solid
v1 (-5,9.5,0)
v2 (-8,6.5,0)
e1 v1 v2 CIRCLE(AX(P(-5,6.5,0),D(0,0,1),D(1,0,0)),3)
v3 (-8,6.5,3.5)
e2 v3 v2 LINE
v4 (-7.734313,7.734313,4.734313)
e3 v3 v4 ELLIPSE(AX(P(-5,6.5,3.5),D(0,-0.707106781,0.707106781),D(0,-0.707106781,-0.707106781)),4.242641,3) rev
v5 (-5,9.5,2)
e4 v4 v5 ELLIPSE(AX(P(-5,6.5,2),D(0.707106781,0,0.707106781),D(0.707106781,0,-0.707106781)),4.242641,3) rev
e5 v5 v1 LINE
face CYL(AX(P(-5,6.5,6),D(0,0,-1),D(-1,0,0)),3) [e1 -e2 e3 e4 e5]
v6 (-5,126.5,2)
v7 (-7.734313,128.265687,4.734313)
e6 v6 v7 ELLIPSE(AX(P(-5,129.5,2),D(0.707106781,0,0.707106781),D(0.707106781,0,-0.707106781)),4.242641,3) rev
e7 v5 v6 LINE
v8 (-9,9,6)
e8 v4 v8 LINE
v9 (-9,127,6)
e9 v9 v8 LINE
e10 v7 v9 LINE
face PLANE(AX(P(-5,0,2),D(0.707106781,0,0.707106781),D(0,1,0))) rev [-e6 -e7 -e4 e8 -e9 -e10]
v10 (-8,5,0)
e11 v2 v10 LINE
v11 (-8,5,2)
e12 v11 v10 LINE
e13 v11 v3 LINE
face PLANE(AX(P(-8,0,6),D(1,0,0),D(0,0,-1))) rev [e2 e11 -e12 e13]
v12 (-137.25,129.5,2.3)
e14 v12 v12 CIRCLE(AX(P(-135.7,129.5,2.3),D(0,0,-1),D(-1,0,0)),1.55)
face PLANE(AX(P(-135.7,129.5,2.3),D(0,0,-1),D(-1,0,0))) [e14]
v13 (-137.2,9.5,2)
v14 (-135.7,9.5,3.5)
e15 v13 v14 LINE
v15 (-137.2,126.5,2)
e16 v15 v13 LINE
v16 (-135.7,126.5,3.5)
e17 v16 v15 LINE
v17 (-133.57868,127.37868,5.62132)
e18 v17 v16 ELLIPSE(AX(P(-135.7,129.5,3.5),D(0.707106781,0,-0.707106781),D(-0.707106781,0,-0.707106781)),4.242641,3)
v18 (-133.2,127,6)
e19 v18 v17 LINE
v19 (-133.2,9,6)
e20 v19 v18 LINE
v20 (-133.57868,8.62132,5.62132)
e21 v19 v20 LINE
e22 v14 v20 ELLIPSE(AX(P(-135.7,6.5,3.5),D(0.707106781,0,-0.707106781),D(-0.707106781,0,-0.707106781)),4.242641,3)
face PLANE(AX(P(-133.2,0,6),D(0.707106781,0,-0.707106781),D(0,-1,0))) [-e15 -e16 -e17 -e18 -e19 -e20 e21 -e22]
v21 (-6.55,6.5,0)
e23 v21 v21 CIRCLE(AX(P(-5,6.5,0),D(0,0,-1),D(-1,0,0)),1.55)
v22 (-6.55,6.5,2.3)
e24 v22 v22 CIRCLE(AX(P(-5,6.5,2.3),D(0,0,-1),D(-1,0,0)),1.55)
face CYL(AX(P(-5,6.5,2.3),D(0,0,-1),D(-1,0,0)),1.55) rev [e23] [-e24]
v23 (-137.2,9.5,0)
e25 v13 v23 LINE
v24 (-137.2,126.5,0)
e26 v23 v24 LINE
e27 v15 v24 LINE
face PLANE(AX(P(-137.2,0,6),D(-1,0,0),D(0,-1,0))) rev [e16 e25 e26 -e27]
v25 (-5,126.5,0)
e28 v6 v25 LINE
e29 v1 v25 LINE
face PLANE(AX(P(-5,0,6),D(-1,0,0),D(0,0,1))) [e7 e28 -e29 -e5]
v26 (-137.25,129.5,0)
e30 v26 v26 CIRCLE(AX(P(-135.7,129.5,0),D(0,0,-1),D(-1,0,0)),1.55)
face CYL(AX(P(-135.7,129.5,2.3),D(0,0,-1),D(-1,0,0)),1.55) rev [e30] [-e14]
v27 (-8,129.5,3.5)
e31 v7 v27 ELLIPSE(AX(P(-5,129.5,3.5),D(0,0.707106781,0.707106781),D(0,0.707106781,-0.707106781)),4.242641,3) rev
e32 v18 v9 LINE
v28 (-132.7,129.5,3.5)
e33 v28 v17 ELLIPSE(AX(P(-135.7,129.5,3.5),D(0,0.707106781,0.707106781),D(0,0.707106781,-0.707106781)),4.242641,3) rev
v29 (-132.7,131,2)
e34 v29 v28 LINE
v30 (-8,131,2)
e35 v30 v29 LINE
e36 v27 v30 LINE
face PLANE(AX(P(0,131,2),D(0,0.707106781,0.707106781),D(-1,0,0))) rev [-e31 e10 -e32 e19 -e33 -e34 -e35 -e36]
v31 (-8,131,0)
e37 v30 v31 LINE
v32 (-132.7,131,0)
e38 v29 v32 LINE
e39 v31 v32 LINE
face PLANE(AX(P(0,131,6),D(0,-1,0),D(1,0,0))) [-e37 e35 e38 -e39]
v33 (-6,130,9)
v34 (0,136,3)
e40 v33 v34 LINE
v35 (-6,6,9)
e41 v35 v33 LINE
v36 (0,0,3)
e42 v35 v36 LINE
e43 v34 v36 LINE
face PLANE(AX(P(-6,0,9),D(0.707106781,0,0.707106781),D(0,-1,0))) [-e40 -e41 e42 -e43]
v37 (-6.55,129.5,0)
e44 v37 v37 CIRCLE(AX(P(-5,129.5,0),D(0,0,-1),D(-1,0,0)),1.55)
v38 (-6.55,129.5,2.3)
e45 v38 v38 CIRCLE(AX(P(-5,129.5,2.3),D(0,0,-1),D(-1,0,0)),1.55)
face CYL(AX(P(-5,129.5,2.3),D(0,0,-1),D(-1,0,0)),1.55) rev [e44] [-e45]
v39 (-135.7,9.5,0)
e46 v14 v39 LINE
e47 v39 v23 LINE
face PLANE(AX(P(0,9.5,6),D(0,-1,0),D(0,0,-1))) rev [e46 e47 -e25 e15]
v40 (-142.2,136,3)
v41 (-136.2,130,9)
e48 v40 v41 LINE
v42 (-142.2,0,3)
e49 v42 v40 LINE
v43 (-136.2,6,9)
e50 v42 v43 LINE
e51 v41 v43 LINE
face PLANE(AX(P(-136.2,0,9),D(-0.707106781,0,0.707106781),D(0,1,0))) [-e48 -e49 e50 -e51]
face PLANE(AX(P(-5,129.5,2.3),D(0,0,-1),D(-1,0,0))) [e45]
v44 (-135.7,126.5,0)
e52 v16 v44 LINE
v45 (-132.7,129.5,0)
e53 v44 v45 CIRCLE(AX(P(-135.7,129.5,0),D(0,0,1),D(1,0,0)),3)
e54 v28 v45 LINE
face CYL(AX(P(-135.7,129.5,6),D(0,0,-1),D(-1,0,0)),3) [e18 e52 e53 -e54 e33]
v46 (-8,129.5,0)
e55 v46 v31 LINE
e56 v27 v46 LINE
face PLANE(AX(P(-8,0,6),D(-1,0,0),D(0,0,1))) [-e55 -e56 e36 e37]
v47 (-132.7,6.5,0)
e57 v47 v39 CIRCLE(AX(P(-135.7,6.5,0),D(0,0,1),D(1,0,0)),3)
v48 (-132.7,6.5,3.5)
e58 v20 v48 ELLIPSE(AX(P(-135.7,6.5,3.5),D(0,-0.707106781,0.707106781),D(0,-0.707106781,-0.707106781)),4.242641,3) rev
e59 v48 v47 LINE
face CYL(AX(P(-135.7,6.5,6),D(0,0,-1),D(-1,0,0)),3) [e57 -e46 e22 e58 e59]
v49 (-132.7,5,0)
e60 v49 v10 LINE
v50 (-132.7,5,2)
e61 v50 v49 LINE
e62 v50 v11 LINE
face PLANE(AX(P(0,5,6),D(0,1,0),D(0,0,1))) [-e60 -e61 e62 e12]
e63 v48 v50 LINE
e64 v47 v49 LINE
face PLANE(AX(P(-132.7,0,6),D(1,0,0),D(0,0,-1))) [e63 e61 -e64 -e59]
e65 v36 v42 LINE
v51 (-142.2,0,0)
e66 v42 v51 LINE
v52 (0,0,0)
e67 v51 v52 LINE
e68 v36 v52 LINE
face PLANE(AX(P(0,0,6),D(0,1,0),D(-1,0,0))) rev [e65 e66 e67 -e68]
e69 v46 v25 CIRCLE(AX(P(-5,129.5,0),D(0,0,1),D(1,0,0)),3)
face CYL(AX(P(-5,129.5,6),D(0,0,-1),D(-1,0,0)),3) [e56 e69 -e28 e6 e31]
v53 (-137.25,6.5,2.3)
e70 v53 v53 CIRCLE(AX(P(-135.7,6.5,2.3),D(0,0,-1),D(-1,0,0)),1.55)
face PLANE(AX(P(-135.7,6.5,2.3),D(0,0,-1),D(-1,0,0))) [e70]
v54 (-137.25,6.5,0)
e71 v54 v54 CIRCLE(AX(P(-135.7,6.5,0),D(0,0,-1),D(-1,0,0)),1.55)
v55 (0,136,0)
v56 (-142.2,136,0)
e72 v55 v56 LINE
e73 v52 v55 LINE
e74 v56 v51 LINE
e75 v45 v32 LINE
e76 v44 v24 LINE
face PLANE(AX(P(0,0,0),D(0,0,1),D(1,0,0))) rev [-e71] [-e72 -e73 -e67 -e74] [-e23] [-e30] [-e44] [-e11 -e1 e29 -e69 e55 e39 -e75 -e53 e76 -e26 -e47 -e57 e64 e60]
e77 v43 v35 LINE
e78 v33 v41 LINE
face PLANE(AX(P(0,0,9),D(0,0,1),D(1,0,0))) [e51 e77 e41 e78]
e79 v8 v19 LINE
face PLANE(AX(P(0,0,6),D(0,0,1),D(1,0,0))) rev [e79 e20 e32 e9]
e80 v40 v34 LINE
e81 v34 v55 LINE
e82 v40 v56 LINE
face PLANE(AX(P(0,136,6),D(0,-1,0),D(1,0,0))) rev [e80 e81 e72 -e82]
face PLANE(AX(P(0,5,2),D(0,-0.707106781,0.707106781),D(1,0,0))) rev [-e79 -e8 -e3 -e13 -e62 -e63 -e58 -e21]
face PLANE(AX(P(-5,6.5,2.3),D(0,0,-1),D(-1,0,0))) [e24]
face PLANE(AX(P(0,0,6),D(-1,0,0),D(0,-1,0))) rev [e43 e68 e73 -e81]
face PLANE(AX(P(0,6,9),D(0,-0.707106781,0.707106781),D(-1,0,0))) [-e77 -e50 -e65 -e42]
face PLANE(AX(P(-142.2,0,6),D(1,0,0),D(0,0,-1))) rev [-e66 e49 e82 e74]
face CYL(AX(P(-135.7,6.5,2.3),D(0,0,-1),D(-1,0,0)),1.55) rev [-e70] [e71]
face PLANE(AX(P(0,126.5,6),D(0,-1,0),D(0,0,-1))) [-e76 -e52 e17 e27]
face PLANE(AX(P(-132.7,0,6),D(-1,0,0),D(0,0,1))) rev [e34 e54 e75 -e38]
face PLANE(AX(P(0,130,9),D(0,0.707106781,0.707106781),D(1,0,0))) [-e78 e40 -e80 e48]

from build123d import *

# Parameters (mm, degrees)
SKETCH1_W           = 142.2
SKETCH1_H           = 136
BOSS_EXTRUDE1_DEPTH = 6
SKETCH2_W           = 142.2
SKETCH2_H           = 136
BOSS_EXTRUDE2_DEPTH = 3
CHAMFER1_SIZE       = 6
CHAMFER2_SIZE       = 4
SKETCH3_R           = 1.55
CUT_EXTRUDE1_DEPTH  = 2.3


with BuildPart() as part:
    # Sketch1 → Boss-Extrude1 (new body)
    with BuildSketch(Plane.XY):
        with Locations((-71.1, 68)):
            Rectangle(SKETCH1_W, SKETCH1_H)
        with BuildLine():
            ThreePointArc((-5, 9.5), (-7.121320344, 8.621320344), (-8, 6.5))
            Line((-8, 6.5), (-8, 5))
            Line((-8, 5), (-132.7, 5))
            Line((-132.7, 5), (-132.7, 6.5))
            ThreePointArc((-132.7, 6.5), (-133.578679656, 8.621320344), (-135.7, 9.5))
            Line((-135.7, 9.5), (-137.2, 9.5))
            Line((-137.2, 9.5), (-137.2, 126.5))
            Line((-137.2, 126.5), (-135.7, 126.5))
            ThreePointArc((-135.7, 126.5), (-133.578679656, 127.378679656), (-132.7, 129.5))
            Line((-132.7, 129.5), (-132.7, 131))
            Line((-132.7, 131), (-8, 131))
            Line((-8, 131), (-8, 129.5))
            ThreePointArc((-8, 129.5), (-7.121320344, 127.378679656), (-5, 126.5))
            Line((-5, 126.5), (-5, 9.5))
        make_face(mode=Mode.SUBTRACT)
    extrude(amount=BOSS_EXTRUDE1_DEPTH)

    # Sketch2 → Boss-Extrude2 (add)
    with BuildSketch(Plane.XY.offset(6)):
        with Locations((-71.1, 68)):
            Rectangle(SKETCH2_W, SKETCH2_H)
    extrude(amount=BOSS_EXTRUDE2_DEPTH)

    # Chamfer1
    chamfer1_edges = [part.edges().sort_by_distance(p)[0] for p in [
        (-142.2, 68, 9),
        (-71.1, 0, 9),
        (0, 68, 9),
        (-71.1, 136, 9),
    ]]
    chamfer(chamfer1_edges, length=CHAMFER1_SIZE)

    # Chamfer2
    # the kernel refuses this chamfer: 4 mm, written as the material it adds along each edge
    with BuildSketch(Plane(origin=(-142.986731952, 131, 6), x_dir=(0, 0.02749587661058907, -0.9996219169112965), z_dir=(1, 0, 0))) as chamfer2_piece_1_section:
        Polygon((CHAMFER2_SIZE * 0.999621916911, -CHAMFER2_SIZE * 0.0274958766106), (-CHAMFER2_SIZE * 0.0274958766106, -CHAMFER2_SIZE * 0.999621916911), (0, 0), align=None)
    chamfer2_piece_1 = extrude(amount=145.273463904, mode=Mode.PRIVATE)
    chamfer2_piece_1 = split(chamfer2_piece_1, bisect_by=Plane(origin=(-142.2, 127.973585933, 5.513207057), z_dir=(1, 0, 0)), keep=Keep.TOP, mode=Mode.PRIVATE)
    chamfer2_piece_1 = split(chamfer2_piece_1, bisect_by=Plane(origin=(0, 127.973585933, 5.513207057), z_dir=(-1, 0, 0)), keep=Keep.TOP, mode=Mode.PRIVATE)
    chamfer2_piece_1 = split(chamfer2_piece_1, bisect_by=Plane(origin=(-136.314439618, 127.973585933, 8.885560382), z_dir=(0.7071067811865476, 0, -0.7071067811865476)), keep=Keep.TOP, mode=Mode.PRIVATE)
    chamfer2_piece_1 = split(chamfer2_piece_1, bisect_by=Plane(origin=(-67.727646674, 127.973585933, 70.727646674), z_dir=(-0.7071067811865476, 0, -0.7071067811865476)), keep=Keep.TOP, mode=Mode.PRIVATE)
    add(chamfer2_piece_1)
    with BuildSketch(Plane(origin=(-5, 136.786731952, 6), x_dir=(0.02749587661058627, 0, -0.9996219169112968), z_dir=(0, -1, 0))) as chamfer2_piece_2_section:
        Polygon((CHAMFER2_SIZE * 0.999621916911, -CHAMFER2_SIZE * 0.0274958766106), (-CHAMFER2_SIZE * 0.0274958766106, -CHAMFER2_SIZE * 0.999621916911), (0, 0), align=None)
    chamfer2_piece_2 = extrude(amount=137.573463904, mode=Mode.PRIVATE)
    chamfer2_piece_2 = split(chamfer2_piece_2, bisect_by=Plane(origin=(-8.333333333, 5, 5.666666667), z_dir=(0, 1, 0)), keep=Keep.TOP, mode=Mode.PRIVATE)
    chamfer2_piece_2 = split(chamfer2_piece_2, bisect_by=Plane(origin=(-8.333333333, 131, 5.666666667), z_dir=(0, -1, 0)), keep=Keep.TOP, mode=Mode.PRIVATE)
    add(chamfer2_piece_2)
    with BuildSketch(Plane(origin=(2.286731952, 5, 6), x_dir=(0, -0.02749587661058627, -0.9996219169112968), z_dir=(-1, 0, 0))) as chamfer2_piece_3_section:
        Polygon((CHAMFER2_SIZE * 0.999621916911, -CHAMFER2_SIZE * 0.0274958766106), (-CHAMFER2_SIZE * 0.0274958766106, -CHAMFER2_SIZE * 0.999621916911), (0, 0), align=None)
    chamfer2_piece_3 = extrude(amount=145.273463904, mode=Mode.PRIVATE)
    chamfer2_piece_3 = split(chamfer2_piece_3, bisect_by=Plane(origin=(-142.2, 8.026414067, 5.513207057), z_dir=(1, 0, 0)), keep=Keep.TOP, mode=Mode.PRIVATE)
    chamfer2_piece_3 = split(chamfer2_piece_3, bisect_by=Plane(origin=(0, 8.026414067, 5.513207057), z_dir=(-1, 0, 0)), keep=Keep.TOP, mode=Mode.PRIVATE)
    chamfer2_piece_3 = split(chamfer2_piece_3, bisect_by=Plane(origin=(-73.722353326, 8.026414067, 71.477646674), z_dir=(0.7071067811865476, 0, -0.7071067811865476)), keep=Keep.TOP, mode=Mode.PRIVATE)
    chamfer2_piece_3 = split(chamfer2_piece_3, bisect_by=Plane(origin=(-5.135560382, 8.026414067, 8.135560382), z_dir=(-0.7071067811865476, 0, -0.7071067811865476)), keep=Keep.TOP, mode=Mode.PRIVATE)
    add(chamfer2_piece_3)
    with BuildSketch(Plane(origin=(-137.2, -0.786731952, 6), x_dir=(-0.02749587661058907, 0, -0.9996219169112965), z_dir=(0, 1, 0))) as chamfer2_piece_4_section:
        Polygon((CHAMFER2_SIZE * 0.999621916911, -CHAMFER2_SIZE * 0.0274958766106), (-CHAMFER2_SIZE * 0.0274958766106, -CHAMFER2_SIZE * 0.999621916911), (0, 0), align=None)
    chamfer2_piece_4 = extrude(amount=137.573463904, mode=Mode.PRIVATE)
    chamfer2_piece_4 = split(chamfer2_piece_4, bisect_by=Plane(origin=(-134.173585933, 0, 5.513207057), z_dir=(0, 1, 0)), keep=Keep.TOP, mode=Mode.PRIVATE)
    chamfer2_piece_4 = split(chamfer2_piece_4, bisect_by=Plane(origin=(-134.173585933, 5.885560382, 8.885560382), z_dir=(0, 0.7071067811865476, -0.7071067811865476)), keep=Keep.TOP, mode=Mode.PRIVATE)
    chamfer2_piece_4 = split(chamfer2_piece_4, bisect_by=Plane(origin=(-134.173585933, 136, 5.513207057), z_dir=(0, -1, 0)), keep=Keep.TOP, mode=Mode.PRIVATE)
    chamfer2_piece_4 = split(chamfer2_piece_4, bisect_by=Plane(origin=(-134.173585933, 71.372353326, 67.627646674), z_dir=(0, -0.7071067811865476, -0.7071067811865476)), keep=Keep.TOP, mode=Mode.PRIVATE)
    add(chamfer2_piece_4)

    # Sketch3 → Cut-Extrude1 (cut)
    with BuildSketch(Plane(origin=(0, 0, 0), x_dir=(-1, 0, 0), z_dir=(0, 0, -1))):
        with Locations((135.7, 129.5)):
            Circle(SKETCH3_R)
        with Locations((135.7, 6.5)):
            Circle(SKETCH3_R)
        with Locations((5, 6.5)):
            Circle(SKETCH3_R)
        with Locations((5, 129.5)):
            Circle(SKETCH3_R)
    extrude(amount=-CUT_EXTRUDE1_DEPTH, mode=Mode.SUBTRACT)


solid = part.part
